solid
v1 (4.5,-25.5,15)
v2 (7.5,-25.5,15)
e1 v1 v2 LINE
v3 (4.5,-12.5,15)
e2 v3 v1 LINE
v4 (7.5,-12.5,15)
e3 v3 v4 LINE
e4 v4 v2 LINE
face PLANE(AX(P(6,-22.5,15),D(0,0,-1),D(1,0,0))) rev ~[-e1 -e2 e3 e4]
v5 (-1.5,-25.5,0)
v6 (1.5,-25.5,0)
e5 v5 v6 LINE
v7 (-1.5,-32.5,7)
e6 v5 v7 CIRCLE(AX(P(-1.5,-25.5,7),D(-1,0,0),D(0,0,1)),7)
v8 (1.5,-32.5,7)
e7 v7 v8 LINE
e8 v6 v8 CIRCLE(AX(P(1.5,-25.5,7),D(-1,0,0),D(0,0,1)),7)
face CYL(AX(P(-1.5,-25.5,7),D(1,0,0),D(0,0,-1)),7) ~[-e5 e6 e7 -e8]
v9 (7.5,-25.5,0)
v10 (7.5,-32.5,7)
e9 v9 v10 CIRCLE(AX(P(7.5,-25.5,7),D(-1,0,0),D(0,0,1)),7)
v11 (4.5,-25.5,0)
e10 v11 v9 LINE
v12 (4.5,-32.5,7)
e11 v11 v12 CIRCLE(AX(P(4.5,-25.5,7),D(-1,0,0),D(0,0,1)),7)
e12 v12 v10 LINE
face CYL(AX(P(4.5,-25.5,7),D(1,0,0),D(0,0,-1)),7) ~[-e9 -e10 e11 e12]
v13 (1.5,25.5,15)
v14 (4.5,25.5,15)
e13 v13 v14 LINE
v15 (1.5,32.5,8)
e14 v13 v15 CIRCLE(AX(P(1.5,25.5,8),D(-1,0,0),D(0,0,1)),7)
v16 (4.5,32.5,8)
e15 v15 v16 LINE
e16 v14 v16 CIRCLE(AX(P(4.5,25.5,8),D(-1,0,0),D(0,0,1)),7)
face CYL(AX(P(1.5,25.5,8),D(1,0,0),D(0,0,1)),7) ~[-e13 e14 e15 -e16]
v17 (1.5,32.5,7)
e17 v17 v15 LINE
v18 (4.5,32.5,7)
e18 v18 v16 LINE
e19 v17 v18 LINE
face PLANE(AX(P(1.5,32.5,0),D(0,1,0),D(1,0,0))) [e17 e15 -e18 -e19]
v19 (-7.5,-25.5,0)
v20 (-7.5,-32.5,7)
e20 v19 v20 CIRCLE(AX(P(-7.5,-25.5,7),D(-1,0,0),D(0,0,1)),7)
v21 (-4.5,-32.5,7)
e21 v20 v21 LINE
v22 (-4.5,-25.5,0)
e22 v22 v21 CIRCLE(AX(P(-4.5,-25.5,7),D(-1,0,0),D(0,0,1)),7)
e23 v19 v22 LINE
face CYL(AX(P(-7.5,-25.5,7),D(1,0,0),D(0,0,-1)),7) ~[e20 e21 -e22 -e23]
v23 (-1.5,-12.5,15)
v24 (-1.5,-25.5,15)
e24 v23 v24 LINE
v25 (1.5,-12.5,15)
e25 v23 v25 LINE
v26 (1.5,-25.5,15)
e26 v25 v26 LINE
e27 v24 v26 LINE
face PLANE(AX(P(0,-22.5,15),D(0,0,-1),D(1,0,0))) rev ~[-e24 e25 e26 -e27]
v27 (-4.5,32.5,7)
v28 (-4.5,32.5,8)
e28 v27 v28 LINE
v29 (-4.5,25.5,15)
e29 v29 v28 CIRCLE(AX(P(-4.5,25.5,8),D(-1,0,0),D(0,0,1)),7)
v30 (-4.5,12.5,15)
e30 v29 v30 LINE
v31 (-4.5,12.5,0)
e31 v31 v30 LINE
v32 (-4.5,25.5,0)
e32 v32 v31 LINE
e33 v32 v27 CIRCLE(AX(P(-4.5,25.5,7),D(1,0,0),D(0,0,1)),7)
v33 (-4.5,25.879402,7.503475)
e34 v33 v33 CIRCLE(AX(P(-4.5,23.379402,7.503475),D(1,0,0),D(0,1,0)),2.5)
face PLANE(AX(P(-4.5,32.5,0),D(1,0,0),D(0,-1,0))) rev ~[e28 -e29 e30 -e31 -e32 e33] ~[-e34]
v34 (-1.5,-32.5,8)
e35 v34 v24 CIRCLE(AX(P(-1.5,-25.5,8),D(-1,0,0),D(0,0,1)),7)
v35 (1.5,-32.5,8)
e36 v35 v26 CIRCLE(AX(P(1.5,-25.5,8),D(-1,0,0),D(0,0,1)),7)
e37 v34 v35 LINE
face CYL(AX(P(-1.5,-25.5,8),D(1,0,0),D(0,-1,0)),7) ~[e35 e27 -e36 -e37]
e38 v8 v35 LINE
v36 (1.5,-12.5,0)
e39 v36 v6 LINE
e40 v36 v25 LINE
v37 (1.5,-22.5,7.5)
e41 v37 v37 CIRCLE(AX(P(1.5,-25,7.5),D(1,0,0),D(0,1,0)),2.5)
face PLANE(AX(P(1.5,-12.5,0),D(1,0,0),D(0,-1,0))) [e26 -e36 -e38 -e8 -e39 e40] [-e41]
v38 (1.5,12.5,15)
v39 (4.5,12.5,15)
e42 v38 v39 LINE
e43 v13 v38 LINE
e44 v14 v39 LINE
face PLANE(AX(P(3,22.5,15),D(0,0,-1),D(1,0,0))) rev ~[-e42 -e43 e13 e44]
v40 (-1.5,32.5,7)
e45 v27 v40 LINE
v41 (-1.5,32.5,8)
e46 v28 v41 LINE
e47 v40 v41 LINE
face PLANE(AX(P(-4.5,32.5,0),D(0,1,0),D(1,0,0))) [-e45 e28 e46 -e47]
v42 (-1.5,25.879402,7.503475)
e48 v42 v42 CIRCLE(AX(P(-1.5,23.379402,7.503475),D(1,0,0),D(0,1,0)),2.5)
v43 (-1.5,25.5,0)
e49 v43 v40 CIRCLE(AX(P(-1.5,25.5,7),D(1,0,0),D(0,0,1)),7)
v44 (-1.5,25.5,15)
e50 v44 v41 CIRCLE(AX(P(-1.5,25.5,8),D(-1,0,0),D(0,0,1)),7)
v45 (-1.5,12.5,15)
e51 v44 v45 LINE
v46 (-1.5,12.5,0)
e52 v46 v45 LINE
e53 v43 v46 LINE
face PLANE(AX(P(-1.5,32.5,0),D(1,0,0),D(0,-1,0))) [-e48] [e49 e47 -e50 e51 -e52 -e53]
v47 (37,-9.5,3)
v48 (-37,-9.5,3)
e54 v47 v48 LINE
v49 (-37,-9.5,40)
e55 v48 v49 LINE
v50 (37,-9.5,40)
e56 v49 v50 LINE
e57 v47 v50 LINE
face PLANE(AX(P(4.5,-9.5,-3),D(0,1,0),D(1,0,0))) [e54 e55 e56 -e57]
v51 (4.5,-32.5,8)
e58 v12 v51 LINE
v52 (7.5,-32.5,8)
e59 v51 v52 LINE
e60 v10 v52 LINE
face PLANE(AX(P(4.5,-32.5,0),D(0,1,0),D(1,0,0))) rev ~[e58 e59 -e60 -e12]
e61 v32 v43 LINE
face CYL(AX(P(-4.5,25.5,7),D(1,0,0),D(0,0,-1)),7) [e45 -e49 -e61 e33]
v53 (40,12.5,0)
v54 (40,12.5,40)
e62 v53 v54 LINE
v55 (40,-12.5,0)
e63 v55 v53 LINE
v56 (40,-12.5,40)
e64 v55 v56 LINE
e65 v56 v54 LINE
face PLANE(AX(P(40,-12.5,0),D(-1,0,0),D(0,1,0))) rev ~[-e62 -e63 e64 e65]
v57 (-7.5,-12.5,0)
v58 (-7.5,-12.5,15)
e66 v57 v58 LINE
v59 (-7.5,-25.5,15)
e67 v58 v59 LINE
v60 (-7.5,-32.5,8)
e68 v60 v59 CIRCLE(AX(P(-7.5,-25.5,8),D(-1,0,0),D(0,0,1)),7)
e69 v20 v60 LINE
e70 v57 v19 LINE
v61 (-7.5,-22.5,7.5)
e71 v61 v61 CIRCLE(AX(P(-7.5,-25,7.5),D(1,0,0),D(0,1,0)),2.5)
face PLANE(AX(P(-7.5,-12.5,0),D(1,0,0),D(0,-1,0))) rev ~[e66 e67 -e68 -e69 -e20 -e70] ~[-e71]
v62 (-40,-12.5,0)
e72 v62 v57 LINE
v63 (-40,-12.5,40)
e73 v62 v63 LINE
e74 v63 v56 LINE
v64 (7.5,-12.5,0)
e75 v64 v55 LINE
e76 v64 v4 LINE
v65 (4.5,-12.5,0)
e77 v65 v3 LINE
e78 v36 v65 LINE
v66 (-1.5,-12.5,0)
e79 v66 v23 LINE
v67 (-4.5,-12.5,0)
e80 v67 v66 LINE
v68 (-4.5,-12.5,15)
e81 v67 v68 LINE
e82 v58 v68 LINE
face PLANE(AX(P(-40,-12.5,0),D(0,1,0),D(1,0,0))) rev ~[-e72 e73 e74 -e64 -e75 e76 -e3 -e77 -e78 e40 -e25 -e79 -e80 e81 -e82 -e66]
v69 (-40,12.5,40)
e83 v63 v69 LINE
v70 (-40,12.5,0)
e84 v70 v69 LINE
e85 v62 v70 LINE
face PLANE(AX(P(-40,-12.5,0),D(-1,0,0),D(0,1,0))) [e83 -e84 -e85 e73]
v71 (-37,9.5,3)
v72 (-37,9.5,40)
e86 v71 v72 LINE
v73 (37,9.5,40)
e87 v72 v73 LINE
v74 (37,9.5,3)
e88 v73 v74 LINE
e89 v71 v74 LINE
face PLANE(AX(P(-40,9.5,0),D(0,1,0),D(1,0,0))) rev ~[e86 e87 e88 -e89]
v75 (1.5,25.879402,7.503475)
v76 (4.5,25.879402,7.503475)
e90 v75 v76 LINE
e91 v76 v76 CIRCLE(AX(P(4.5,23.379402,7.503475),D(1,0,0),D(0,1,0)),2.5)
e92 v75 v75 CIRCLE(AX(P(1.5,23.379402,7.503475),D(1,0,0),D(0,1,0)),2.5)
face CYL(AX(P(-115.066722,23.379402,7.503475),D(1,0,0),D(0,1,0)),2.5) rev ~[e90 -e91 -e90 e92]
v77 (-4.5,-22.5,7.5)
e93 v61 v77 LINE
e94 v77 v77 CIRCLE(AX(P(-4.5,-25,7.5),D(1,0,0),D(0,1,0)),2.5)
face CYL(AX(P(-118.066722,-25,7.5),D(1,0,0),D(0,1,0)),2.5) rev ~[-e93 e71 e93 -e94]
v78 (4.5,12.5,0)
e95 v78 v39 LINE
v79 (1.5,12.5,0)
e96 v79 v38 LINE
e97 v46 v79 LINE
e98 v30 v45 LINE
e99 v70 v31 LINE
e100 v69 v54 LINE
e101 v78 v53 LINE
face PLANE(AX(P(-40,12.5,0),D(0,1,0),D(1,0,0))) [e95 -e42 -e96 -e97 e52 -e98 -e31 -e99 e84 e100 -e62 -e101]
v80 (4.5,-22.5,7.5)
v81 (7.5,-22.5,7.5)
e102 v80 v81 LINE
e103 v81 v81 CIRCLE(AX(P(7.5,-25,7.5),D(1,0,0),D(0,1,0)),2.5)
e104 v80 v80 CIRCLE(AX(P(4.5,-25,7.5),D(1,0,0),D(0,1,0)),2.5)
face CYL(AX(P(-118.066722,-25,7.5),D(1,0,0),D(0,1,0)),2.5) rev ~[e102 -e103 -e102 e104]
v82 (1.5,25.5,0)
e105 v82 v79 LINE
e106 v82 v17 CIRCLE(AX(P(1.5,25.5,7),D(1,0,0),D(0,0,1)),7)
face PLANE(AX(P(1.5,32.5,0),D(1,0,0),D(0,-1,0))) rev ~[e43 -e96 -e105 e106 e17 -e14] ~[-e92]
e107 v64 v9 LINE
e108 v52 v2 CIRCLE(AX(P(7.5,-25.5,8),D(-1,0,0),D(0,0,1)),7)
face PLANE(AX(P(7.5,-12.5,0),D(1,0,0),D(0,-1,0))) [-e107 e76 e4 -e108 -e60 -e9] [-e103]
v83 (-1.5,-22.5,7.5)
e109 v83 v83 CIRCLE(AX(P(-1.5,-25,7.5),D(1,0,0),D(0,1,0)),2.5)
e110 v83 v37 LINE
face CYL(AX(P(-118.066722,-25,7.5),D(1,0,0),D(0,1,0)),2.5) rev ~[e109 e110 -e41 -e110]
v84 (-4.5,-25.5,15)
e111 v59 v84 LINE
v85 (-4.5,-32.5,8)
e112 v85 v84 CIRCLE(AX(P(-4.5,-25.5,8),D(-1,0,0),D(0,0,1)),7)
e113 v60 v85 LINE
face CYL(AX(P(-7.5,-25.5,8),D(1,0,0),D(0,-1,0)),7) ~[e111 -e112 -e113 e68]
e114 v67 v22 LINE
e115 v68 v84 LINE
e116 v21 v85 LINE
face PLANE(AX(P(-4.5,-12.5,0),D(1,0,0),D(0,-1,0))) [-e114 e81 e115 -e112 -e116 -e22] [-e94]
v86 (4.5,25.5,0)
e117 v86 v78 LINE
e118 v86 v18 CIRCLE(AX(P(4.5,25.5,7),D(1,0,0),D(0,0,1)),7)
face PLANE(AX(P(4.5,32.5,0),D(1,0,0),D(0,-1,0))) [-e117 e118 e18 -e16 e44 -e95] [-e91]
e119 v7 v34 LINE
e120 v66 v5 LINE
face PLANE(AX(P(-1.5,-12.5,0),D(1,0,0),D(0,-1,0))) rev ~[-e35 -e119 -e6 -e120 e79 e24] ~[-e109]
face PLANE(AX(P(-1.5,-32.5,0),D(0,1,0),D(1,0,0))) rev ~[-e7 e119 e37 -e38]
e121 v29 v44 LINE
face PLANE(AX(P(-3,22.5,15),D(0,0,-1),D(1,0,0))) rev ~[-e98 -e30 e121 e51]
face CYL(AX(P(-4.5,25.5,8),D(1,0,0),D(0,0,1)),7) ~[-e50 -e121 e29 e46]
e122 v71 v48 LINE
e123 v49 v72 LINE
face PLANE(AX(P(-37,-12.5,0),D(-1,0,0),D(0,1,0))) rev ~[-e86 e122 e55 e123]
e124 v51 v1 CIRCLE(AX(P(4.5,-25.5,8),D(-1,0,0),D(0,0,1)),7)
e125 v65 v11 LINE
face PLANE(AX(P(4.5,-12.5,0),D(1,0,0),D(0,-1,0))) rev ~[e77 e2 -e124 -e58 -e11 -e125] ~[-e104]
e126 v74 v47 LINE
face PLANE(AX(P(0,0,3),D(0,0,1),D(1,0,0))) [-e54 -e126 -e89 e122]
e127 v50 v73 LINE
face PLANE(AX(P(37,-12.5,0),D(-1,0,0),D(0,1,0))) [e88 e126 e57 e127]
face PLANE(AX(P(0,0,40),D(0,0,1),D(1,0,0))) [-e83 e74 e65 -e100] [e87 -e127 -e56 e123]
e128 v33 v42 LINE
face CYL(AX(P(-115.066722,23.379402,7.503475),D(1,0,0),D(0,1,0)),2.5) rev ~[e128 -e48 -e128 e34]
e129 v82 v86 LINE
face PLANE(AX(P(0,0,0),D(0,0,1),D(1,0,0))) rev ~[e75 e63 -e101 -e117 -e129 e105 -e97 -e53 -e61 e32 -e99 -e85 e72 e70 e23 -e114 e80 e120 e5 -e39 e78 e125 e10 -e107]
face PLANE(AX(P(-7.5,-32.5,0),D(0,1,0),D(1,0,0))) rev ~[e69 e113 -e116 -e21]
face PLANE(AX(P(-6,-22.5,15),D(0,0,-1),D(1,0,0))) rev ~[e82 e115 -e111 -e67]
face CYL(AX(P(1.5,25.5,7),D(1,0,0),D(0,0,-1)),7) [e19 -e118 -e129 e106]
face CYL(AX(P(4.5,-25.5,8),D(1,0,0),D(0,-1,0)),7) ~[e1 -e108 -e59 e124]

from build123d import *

# Parameters (mm, degrees)
F0_W          = 80
F0_H          = 25
F1_DEPTH      = 40
F2_W          = 3
F2_H          = 20
F3_DEPTH      = 15
F4_R          = 7
F5_R          = 7
F7_D          = 5
F9_D          = 5
F10_T         = 3
F10_T3_DEPTH  = 21
F10_T5_DEPTH  = 9
F10_T7_DEPTH  = 9
F10_T9_DEPTH  = 9
F10_T11_DEPTH = 9
F10_T13_DEPTH = 9


# Not quite as in the source:
# - a shell that OpenCascade refuses in one call is made with other operations: the cavity is built on its own and cut out


with BuildPart() as f1:
    # F0 (on Top) → F1 (new body)
    with BuildSketch(Plane.XY):
        Rectangle(F0_W, F0_H)
    extrude(amount=F1_DEPTH)

    # F2 (on face) → F3 (join)
    with BuildSketch(Plane(origin=(0, 0, 0), x_dir=(1, 0, 0), z_dir=(0, 0, -1))):
        with Locations((-6, 22.5)):
            Rectangle(F2_W, F2_H)
        with Locations((0, 22.5)):
            Rectangle(F2_W, F2_H)
        with Locations((6, 22.5)):
            Rectangle(F2_W, F2_H)
        with Locations((3, -22.5)):
            Rectangle(F2_W, F2_H)
        with Locations((-3, -22.5)):
            Rectangle(F2_W, F2_H)
    extrude(amount=-F3_DEPTH)

    # F4
    f4_edges = [f1.edges().sort_by_distance(p)[0] for p in [
        (3, 32.5, 0),
        (-3, 32.5, 0),
        (-3, 32.5, 15),
        (3, 32.5, 15),
    ]]
    fillet(f4_edges, radius=F4_R)

    # F5
    f5_edges = [f1.edges().sort_by_distance(p)[0] for p in [
        (-6, -32.5, 15),
        (0, -32.5, 15),
        (6, -32.5, 15),
        (6, -32.5, 0),
        (0, -32.5, 0),
        (-6, -32.5, 0),
    ]]
    fillet(f5_edges, radius=F5_R)

    # F7 (through all)
    with Locations(Plane(origin=(-7.5, 0, 0), x_dir=(0, -1, 0), z_dir=(-1, 0, 0))):
        with Locations((25, 7.5)):
            Hole(F7_D / 2)

    # F9 (through all)
    with Locations(Plane(origin=(-4.5, 0, 0), x_dir=(0, -1, 0), z_dir=(-1, 0, 0))):
        with Locations((-23.3794022352, 7.5034750625)):
            Hole(F9_D / 2)

    # F10: shell of thickness 3, made by hand


with BuildPart() as f10_core1:
    # F10_t2: copy of F1
    add(f1.part)

    # the walls: a layer under each face that stays
    f10_faces = [f10_core1.faces().sort_by_distance(p)[0] for p in [
        (0, 0, 0),
        (7.5, -15.8333333333, 12.5),
        (6, -30.4497474683, 2.0502525317),
        (0, -12.5, 20),
        (4.5, -29.1666666667, 12.5),
        (40, 0, 20),
        (0, 12.5, 20),
        (1.5, -15.8333333333, 12.5),
        (4.5, 29.1666666667, 12.5),
        (0, -30.4497474683, 2.0502525317),
        (3, 30.4497474683, 2.0502525317),
        (-1.5, -29.1666666667, 12.5),
        (1.5, 15.8333333333, 12.5),
        (-4.5, -15.8333333333, 12.5),
        (-1.5, 29.1666666667, 12.5),
        (-6, -30.4497474683, 2.0502525317),
        (-3, 30.4497474683, 2.0502525317),
        (-7.5, -29.1666666667, 12.5),
        (-4.5, 15.8333333333, 12.5),
        (-40, 0, 20),
        (6, -32.5, 7.5),
        (6, -30.4497474683, 12.9497474683),
        (6, -19, 15),
        (6, -22.5, 7.5),
        (-6, -19, 15),
        (0, -19, 15),
        (3, 19, 15),
        (-3, 19, 15),
        (0, -32.5, 7.5),
        (0, -30.4497474683, 12.9497474683),
        (0, -22.5, 7.5),
        (3, 32.5, 7.5),
        (3, 30.4497474683, 12.9497474683),
        (3, 25.8794022352, 7.5034750625),
        (-6, -32.5, 7.5),
        (-6, -30.4497474683, 12.9497474683),
        (-6, -22.5, 7.5),
        (-3, 32.5, 7.5),
        (-3, 30.4497474683, 12.9497474683),
        (-3, 25.8794022352, 7.5034750625),
    ]]
    thicken(f10_faces, amount=-F10_T, mode=Mode.SUBTRACT)

    # F10_s4 → F10_t3 (cut)
    with BuildSketch(Plane.XY.offset(-3)):
        Polygon((7.53, -12.53), (4.5, -12.5), (4.5, -9.5), (7.5, -9.5), align=None)
        Polygon((-7.53, -12.53), (-7.5, -9.5), (-4.5, -9.5), (-4.5, -12.5), align=None)
        Polygon((-4.47, -12.53), (-4.5, -9.5), (-7.5, -9.5), (-7.5, -12.5), align=None)
        Polygon((-1.53, -12.53), (-1.5, -9.5), (1.5, -9.5), (1.5, -12.5), align=None)
        Polygon((1.53, -12.53), (1.5, -9.5), (-1.5, -9.5), (-1.5, -12.5), align=None)
        Polygon((4.47, -12.53), (4.5, -9.5), (7.5, -9.5), (7.5, -12.5), align=None)
        Polygon((4.53, 12.53), (4.5, 9.5), (1.5, 9.5), (1.5, 12.5), align=None)
        Polygon((1.47, 12.53), (1.5, 9.5), (4.5, 9.5), (4.5, 12.5), align=None)
        Polygon((-1.47, 12.53), (-1.5, 9.5), (-4.5, 9.5), (-4.5, 12.5), align=None)
        Polygon((-4.53, 12.53), (-4.5, 9.5), (-1.5, 9.5), (-1.5, 12.5), align=None)
    extrude(amount=F10_T3_DEPTH, mode=Mode.SUBTRACT)

    # F10_s6 → F10_t5 (cut)
    with BuildSketch(Plane.YZ.offset(-10.5)):
        Polygon((-12.53, 15.03), (-9.5, 15), (-9.5, 12), (-12.5, 12), align=None)
    extrude(amount=F10_T5_DEPTH, mode=Mode.SUBTRACT)

    # F10_s8 → F10_t7 (cut)
    with BuildSketch(Plane.YZ.offset(-4.5)):
        Polygon((-12.53, 15.03), (-9.5, 15), (-9.5, 12), (-12.5, 12), align=None)
    extrude(amount=F10_T7_DEPTH, mode=Mode.SUBTRACT)

    # F10_s10 → F10_t9 (cut)
    with BuildSketch(Plane.YZ.offset(1.5)):
        Polygon((-12.53, 15.03), (-9.5, 15), (-9.5, 12), (-12.5, 12), align=None)
    extrude(amount=F10_T9_DEPTH, mode=Mode.SUBTRACT)

    # F10_s12 → F10_t11 (cut)
    with BuildSketch(Plane.YZ.offset(-1.5)):
        Polygon((12.53, 15.03), (9.5, 15), (9.5, 12), (12.5, 12), align=None)
    extrude(amount=F10_T11_DEPTH, mode=Mode.SUBTRACT)

    # F10_s14 → F10_t13 (cut)
    with BuildSketch(Plane.YZ.offset(-7.5)):
        Polygon((12.53, 15.03), (9.5, 15), (9.5, 12), (12.5, 12), align=None)
    extrude(amount=F10_T13_DEPTH, mode=Mode.SUBTRACT)


with BuildPart() as f1_1:
    add(f1.part)

    # what is left inside the walls is the cavity
    f10_cavity = [f10_core1.part.solids().sort_by_distance(p)[0] for p in [
        (0, 9.47, 27.666667),
    ]]
    add(f10_cavity, mode=Mode.SUBTRACT)


solid = f1_1.part
